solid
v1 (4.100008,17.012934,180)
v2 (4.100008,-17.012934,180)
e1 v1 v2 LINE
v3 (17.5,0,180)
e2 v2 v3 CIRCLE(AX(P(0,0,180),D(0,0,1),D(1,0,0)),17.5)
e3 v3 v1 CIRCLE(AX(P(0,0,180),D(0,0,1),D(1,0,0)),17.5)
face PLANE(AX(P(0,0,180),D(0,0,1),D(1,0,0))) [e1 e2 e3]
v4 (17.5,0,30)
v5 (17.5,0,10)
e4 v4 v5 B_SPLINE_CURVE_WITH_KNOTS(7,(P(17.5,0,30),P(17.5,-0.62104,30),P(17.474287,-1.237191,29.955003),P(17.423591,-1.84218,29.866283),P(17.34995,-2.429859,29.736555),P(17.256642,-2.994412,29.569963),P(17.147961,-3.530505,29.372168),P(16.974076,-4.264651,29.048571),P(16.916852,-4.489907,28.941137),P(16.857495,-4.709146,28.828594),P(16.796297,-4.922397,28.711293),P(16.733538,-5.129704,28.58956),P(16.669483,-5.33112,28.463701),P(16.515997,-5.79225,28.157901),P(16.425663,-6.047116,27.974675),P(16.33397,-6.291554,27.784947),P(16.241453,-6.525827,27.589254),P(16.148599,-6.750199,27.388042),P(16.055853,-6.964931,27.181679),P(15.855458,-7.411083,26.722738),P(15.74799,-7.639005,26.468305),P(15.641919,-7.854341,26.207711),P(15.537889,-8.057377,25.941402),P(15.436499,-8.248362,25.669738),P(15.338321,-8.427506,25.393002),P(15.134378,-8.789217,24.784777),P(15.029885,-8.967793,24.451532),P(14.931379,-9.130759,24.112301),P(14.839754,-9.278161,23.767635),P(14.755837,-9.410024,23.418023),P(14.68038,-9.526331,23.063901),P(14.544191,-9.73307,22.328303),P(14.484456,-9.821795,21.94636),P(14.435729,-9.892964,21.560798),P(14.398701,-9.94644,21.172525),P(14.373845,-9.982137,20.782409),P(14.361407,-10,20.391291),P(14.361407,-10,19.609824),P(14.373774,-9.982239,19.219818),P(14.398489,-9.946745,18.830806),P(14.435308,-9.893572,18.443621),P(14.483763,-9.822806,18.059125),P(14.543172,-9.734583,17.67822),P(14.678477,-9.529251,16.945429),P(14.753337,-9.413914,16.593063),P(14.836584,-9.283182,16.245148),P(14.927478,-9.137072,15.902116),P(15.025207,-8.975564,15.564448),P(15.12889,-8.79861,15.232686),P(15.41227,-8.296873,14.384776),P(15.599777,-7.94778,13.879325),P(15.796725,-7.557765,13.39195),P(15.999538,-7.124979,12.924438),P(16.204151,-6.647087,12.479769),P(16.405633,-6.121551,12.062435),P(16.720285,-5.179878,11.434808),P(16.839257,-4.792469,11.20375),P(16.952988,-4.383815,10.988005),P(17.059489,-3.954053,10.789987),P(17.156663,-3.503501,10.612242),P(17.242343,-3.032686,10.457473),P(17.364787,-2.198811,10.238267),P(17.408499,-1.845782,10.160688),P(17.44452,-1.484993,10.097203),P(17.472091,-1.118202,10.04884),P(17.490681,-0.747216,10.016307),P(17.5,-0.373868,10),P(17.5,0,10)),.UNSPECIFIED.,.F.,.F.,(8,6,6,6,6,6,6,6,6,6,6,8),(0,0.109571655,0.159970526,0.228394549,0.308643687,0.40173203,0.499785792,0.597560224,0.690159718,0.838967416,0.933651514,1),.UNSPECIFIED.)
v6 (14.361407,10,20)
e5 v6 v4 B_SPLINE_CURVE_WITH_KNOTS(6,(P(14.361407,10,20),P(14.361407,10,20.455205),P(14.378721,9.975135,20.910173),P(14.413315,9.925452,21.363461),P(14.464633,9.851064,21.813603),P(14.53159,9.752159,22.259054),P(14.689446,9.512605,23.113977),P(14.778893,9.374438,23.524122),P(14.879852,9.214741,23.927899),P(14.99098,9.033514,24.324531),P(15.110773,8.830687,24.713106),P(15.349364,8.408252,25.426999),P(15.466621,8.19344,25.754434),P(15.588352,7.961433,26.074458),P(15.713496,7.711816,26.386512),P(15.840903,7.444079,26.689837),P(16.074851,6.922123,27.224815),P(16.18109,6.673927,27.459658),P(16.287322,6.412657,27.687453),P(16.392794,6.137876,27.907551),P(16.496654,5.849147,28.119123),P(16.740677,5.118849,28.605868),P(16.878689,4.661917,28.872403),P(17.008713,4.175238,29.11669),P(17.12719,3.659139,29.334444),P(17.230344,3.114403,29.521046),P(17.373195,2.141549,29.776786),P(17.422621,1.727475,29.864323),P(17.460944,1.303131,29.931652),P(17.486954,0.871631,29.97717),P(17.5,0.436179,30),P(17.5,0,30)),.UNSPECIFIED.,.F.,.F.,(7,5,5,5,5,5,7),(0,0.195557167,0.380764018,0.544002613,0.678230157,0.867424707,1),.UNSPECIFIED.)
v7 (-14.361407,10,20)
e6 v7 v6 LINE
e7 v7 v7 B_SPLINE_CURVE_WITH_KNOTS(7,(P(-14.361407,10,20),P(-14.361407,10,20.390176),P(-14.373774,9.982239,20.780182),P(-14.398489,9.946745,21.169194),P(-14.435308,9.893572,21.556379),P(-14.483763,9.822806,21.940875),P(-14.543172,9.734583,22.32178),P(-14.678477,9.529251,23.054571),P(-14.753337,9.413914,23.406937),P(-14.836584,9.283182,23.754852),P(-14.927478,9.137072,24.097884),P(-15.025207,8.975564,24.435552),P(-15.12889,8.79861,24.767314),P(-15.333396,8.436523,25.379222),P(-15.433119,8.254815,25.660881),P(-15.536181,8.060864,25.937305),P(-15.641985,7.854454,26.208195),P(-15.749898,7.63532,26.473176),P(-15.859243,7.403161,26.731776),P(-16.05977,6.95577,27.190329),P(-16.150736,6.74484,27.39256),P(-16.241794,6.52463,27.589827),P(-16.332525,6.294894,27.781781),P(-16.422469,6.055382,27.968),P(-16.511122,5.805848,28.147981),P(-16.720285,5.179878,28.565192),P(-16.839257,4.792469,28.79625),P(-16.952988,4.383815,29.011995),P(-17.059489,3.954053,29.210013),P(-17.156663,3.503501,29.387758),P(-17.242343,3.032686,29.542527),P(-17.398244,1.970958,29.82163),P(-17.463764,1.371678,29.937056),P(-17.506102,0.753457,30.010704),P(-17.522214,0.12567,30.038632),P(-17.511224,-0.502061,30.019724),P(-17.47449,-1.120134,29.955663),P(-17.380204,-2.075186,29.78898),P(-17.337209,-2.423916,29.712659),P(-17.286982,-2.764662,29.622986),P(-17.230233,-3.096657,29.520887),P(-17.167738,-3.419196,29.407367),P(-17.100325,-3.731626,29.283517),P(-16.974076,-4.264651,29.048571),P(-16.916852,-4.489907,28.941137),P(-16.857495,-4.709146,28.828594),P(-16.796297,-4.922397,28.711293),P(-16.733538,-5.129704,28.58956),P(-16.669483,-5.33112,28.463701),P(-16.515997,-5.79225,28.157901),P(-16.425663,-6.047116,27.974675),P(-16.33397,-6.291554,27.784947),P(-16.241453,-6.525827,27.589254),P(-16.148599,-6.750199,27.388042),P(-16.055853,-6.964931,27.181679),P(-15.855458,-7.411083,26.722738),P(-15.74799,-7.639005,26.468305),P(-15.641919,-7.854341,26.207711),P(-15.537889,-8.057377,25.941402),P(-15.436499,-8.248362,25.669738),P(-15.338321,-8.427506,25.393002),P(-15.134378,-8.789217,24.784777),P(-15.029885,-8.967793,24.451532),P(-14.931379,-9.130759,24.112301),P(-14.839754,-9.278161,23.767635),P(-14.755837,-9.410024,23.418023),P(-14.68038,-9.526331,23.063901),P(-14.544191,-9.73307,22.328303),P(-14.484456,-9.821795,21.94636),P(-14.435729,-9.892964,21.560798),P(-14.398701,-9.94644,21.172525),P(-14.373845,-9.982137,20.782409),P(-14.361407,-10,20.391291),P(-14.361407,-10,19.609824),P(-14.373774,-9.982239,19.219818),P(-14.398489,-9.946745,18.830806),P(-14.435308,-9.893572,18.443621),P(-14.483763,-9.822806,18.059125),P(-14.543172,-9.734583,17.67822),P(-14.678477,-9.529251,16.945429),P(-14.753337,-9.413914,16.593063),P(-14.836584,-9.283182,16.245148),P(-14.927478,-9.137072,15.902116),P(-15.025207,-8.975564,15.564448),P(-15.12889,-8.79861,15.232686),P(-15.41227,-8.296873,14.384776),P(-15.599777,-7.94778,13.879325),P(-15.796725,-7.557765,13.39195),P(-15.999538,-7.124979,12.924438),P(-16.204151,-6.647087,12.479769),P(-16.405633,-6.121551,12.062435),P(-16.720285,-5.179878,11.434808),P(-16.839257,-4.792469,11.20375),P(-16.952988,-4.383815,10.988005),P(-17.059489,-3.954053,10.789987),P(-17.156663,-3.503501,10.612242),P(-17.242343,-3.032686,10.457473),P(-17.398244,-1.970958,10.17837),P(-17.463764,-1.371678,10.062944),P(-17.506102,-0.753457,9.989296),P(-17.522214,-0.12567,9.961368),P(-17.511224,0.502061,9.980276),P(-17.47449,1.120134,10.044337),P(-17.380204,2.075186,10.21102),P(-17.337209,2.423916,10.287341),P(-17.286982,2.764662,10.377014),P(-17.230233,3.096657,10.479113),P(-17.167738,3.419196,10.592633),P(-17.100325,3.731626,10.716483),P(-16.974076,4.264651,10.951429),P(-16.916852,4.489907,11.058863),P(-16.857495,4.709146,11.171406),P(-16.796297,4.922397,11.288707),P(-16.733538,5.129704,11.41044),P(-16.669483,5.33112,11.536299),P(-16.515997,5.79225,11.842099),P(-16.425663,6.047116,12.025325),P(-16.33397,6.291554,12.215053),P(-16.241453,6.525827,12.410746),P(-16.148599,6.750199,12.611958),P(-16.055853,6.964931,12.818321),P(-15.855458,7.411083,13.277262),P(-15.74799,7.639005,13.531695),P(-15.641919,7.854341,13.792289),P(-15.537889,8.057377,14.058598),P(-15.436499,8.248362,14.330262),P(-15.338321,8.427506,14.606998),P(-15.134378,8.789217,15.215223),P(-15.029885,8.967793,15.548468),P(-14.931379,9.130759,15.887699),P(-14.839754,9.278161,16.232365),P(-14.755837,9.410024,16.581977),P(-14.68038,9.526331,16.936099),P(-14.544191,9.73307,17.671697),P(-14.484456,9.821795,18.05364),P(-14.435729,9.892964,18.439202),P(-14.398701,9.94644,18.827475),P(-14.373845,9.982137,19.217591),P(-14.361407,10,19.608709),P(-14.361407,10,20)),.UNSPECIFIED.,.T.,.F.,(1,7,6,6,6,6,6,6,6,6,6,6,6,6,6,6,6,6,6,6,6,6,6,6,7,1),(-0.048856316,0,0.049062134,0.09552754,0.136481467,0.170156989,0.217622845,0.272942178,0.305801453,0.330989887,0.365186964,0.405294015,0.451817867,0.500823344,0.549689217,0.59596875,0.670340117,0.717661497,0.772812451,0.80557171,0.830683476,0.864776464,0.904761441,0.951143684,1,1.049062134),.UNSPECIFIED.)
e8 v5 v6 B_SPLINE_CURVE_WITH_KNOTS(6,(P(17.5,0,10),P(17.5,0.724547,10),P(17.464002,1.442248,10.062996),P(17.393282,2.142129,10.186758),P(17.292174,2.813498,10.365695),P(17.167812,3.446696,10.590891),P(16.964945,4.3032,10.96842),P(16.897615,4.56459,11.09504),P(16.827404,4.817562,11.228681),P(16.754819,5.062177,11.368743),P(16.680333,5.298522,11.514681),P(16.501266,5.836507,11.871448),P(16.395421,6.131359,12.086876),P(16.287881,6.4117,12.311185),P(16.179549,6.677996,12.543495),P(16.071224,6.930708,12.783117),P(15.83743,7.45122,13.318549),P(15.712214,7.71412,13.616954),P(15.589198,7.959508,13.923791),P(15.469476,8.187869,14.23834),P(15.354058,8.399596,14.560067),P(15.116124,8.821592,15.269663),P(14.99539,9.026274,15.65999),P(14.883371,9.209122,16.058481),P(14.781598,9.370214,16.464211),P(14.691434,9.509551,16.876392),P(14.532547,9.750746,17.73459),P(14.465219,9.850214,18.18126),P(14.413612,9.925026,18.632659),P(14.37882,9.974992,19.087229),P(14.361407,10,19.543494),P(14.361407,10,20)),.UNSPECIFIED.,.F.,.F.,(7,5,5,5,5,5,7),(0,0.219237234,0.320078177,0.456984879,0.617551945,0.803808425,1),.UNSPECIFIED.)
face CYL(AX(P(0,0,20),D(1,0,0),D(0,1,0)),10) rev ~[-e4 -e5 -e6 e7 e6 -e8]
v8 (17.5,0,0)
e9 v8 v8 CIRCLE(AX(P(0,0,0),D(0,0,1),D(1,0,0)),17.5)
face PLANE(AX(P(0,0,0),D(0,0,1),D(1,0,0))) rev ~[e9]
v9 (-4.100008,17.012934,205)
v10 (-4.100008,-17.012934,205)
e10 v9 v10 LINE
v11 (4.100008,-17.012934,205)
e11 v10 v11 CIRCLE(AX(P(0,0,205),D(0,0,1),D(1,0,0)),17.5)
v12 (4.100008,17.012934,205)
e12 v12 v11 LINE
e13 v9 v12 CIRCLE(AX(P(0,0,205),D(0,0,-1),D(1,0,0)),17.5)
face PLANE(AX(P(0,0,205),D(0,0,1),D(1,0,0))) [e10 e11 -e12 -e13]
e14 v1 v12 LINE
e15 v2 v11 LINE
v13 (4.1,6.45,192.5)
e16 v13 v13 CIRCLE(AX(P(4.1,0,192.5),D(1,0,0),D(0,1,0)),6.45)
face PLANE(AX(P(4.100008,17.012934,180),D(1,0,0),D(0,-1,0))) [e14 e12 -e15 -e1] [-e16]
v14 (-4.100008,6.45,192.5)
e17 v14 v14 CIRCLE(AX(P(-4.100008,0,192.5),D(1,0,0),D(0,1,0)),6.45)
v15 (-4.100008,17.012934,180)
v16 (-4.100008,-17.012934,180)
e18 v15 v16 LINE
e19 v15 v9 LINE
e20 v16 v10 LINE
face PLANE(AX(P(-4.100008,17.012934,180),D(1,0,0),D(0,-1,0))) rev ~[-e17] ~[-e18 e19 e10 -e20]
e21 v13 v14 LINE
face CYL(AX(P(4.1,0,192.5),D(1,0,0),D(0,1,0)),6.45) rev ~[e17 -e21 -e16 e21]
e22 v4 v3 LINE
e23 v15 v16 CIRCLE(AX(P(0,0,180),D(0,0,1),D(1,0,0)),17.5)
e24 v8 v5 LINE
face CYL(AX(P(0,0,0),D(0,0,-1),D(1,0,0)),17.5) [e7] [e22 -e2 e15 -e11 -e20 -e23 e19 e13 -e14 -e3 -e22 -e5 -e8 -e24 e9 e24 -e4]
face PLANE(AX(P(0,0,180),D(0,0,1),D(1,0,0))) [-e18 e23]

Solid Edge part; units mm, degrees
sketch "Sketch1" plane through (0, 0, 0) normal (0, 0, 1) x (1, 0, 0)
  circle A0 centre (0, 0) radius 17.5
  dimension "D1" = 35
extrude "Protrusion1" add sketch "Sketch1" along normal blind 180
sketch "Sketch2" plane through (0, 0, 180) normal (0, 0, 1) x (1, 0, 0)
  line L0 (-4.1, 17.0129) -> (-4.1, -17.0129)
  line L1 (4.1, 17.0129) -> (4.1, -17.0129)
  arc A0 (-4.1, 17.0129) -> (4.1, 17.0129) centre (0, 0) cw
  arc A1 (-4.1, -17.0129) -> (4.1, -17.0129) centre (0, 0) ccw
extrude "ExtrudedProtrusion_2" add sketch "Sketch2" along normal blind 25
sketch "Sketch3" plane through (4.1, 0, 212.5) normal (1, 0, 0) x (0, 1, 0)
  circle A0 centre (0, -20) radius 6.45
  dimension "D1" = 12.9
extrude "Cutout1" cut sketch "Sketch3" against normal up to next
sketch "Sketch4" plane through (0, 0, 0) normal (1, 0, 0) x (0, 1, 0)
  circle A0 centre (0, 20) radius 10
  dimension "D1" = 20
extrude "Cutout2" cut sketch "Sketch4" against normal through all and the other way through all
